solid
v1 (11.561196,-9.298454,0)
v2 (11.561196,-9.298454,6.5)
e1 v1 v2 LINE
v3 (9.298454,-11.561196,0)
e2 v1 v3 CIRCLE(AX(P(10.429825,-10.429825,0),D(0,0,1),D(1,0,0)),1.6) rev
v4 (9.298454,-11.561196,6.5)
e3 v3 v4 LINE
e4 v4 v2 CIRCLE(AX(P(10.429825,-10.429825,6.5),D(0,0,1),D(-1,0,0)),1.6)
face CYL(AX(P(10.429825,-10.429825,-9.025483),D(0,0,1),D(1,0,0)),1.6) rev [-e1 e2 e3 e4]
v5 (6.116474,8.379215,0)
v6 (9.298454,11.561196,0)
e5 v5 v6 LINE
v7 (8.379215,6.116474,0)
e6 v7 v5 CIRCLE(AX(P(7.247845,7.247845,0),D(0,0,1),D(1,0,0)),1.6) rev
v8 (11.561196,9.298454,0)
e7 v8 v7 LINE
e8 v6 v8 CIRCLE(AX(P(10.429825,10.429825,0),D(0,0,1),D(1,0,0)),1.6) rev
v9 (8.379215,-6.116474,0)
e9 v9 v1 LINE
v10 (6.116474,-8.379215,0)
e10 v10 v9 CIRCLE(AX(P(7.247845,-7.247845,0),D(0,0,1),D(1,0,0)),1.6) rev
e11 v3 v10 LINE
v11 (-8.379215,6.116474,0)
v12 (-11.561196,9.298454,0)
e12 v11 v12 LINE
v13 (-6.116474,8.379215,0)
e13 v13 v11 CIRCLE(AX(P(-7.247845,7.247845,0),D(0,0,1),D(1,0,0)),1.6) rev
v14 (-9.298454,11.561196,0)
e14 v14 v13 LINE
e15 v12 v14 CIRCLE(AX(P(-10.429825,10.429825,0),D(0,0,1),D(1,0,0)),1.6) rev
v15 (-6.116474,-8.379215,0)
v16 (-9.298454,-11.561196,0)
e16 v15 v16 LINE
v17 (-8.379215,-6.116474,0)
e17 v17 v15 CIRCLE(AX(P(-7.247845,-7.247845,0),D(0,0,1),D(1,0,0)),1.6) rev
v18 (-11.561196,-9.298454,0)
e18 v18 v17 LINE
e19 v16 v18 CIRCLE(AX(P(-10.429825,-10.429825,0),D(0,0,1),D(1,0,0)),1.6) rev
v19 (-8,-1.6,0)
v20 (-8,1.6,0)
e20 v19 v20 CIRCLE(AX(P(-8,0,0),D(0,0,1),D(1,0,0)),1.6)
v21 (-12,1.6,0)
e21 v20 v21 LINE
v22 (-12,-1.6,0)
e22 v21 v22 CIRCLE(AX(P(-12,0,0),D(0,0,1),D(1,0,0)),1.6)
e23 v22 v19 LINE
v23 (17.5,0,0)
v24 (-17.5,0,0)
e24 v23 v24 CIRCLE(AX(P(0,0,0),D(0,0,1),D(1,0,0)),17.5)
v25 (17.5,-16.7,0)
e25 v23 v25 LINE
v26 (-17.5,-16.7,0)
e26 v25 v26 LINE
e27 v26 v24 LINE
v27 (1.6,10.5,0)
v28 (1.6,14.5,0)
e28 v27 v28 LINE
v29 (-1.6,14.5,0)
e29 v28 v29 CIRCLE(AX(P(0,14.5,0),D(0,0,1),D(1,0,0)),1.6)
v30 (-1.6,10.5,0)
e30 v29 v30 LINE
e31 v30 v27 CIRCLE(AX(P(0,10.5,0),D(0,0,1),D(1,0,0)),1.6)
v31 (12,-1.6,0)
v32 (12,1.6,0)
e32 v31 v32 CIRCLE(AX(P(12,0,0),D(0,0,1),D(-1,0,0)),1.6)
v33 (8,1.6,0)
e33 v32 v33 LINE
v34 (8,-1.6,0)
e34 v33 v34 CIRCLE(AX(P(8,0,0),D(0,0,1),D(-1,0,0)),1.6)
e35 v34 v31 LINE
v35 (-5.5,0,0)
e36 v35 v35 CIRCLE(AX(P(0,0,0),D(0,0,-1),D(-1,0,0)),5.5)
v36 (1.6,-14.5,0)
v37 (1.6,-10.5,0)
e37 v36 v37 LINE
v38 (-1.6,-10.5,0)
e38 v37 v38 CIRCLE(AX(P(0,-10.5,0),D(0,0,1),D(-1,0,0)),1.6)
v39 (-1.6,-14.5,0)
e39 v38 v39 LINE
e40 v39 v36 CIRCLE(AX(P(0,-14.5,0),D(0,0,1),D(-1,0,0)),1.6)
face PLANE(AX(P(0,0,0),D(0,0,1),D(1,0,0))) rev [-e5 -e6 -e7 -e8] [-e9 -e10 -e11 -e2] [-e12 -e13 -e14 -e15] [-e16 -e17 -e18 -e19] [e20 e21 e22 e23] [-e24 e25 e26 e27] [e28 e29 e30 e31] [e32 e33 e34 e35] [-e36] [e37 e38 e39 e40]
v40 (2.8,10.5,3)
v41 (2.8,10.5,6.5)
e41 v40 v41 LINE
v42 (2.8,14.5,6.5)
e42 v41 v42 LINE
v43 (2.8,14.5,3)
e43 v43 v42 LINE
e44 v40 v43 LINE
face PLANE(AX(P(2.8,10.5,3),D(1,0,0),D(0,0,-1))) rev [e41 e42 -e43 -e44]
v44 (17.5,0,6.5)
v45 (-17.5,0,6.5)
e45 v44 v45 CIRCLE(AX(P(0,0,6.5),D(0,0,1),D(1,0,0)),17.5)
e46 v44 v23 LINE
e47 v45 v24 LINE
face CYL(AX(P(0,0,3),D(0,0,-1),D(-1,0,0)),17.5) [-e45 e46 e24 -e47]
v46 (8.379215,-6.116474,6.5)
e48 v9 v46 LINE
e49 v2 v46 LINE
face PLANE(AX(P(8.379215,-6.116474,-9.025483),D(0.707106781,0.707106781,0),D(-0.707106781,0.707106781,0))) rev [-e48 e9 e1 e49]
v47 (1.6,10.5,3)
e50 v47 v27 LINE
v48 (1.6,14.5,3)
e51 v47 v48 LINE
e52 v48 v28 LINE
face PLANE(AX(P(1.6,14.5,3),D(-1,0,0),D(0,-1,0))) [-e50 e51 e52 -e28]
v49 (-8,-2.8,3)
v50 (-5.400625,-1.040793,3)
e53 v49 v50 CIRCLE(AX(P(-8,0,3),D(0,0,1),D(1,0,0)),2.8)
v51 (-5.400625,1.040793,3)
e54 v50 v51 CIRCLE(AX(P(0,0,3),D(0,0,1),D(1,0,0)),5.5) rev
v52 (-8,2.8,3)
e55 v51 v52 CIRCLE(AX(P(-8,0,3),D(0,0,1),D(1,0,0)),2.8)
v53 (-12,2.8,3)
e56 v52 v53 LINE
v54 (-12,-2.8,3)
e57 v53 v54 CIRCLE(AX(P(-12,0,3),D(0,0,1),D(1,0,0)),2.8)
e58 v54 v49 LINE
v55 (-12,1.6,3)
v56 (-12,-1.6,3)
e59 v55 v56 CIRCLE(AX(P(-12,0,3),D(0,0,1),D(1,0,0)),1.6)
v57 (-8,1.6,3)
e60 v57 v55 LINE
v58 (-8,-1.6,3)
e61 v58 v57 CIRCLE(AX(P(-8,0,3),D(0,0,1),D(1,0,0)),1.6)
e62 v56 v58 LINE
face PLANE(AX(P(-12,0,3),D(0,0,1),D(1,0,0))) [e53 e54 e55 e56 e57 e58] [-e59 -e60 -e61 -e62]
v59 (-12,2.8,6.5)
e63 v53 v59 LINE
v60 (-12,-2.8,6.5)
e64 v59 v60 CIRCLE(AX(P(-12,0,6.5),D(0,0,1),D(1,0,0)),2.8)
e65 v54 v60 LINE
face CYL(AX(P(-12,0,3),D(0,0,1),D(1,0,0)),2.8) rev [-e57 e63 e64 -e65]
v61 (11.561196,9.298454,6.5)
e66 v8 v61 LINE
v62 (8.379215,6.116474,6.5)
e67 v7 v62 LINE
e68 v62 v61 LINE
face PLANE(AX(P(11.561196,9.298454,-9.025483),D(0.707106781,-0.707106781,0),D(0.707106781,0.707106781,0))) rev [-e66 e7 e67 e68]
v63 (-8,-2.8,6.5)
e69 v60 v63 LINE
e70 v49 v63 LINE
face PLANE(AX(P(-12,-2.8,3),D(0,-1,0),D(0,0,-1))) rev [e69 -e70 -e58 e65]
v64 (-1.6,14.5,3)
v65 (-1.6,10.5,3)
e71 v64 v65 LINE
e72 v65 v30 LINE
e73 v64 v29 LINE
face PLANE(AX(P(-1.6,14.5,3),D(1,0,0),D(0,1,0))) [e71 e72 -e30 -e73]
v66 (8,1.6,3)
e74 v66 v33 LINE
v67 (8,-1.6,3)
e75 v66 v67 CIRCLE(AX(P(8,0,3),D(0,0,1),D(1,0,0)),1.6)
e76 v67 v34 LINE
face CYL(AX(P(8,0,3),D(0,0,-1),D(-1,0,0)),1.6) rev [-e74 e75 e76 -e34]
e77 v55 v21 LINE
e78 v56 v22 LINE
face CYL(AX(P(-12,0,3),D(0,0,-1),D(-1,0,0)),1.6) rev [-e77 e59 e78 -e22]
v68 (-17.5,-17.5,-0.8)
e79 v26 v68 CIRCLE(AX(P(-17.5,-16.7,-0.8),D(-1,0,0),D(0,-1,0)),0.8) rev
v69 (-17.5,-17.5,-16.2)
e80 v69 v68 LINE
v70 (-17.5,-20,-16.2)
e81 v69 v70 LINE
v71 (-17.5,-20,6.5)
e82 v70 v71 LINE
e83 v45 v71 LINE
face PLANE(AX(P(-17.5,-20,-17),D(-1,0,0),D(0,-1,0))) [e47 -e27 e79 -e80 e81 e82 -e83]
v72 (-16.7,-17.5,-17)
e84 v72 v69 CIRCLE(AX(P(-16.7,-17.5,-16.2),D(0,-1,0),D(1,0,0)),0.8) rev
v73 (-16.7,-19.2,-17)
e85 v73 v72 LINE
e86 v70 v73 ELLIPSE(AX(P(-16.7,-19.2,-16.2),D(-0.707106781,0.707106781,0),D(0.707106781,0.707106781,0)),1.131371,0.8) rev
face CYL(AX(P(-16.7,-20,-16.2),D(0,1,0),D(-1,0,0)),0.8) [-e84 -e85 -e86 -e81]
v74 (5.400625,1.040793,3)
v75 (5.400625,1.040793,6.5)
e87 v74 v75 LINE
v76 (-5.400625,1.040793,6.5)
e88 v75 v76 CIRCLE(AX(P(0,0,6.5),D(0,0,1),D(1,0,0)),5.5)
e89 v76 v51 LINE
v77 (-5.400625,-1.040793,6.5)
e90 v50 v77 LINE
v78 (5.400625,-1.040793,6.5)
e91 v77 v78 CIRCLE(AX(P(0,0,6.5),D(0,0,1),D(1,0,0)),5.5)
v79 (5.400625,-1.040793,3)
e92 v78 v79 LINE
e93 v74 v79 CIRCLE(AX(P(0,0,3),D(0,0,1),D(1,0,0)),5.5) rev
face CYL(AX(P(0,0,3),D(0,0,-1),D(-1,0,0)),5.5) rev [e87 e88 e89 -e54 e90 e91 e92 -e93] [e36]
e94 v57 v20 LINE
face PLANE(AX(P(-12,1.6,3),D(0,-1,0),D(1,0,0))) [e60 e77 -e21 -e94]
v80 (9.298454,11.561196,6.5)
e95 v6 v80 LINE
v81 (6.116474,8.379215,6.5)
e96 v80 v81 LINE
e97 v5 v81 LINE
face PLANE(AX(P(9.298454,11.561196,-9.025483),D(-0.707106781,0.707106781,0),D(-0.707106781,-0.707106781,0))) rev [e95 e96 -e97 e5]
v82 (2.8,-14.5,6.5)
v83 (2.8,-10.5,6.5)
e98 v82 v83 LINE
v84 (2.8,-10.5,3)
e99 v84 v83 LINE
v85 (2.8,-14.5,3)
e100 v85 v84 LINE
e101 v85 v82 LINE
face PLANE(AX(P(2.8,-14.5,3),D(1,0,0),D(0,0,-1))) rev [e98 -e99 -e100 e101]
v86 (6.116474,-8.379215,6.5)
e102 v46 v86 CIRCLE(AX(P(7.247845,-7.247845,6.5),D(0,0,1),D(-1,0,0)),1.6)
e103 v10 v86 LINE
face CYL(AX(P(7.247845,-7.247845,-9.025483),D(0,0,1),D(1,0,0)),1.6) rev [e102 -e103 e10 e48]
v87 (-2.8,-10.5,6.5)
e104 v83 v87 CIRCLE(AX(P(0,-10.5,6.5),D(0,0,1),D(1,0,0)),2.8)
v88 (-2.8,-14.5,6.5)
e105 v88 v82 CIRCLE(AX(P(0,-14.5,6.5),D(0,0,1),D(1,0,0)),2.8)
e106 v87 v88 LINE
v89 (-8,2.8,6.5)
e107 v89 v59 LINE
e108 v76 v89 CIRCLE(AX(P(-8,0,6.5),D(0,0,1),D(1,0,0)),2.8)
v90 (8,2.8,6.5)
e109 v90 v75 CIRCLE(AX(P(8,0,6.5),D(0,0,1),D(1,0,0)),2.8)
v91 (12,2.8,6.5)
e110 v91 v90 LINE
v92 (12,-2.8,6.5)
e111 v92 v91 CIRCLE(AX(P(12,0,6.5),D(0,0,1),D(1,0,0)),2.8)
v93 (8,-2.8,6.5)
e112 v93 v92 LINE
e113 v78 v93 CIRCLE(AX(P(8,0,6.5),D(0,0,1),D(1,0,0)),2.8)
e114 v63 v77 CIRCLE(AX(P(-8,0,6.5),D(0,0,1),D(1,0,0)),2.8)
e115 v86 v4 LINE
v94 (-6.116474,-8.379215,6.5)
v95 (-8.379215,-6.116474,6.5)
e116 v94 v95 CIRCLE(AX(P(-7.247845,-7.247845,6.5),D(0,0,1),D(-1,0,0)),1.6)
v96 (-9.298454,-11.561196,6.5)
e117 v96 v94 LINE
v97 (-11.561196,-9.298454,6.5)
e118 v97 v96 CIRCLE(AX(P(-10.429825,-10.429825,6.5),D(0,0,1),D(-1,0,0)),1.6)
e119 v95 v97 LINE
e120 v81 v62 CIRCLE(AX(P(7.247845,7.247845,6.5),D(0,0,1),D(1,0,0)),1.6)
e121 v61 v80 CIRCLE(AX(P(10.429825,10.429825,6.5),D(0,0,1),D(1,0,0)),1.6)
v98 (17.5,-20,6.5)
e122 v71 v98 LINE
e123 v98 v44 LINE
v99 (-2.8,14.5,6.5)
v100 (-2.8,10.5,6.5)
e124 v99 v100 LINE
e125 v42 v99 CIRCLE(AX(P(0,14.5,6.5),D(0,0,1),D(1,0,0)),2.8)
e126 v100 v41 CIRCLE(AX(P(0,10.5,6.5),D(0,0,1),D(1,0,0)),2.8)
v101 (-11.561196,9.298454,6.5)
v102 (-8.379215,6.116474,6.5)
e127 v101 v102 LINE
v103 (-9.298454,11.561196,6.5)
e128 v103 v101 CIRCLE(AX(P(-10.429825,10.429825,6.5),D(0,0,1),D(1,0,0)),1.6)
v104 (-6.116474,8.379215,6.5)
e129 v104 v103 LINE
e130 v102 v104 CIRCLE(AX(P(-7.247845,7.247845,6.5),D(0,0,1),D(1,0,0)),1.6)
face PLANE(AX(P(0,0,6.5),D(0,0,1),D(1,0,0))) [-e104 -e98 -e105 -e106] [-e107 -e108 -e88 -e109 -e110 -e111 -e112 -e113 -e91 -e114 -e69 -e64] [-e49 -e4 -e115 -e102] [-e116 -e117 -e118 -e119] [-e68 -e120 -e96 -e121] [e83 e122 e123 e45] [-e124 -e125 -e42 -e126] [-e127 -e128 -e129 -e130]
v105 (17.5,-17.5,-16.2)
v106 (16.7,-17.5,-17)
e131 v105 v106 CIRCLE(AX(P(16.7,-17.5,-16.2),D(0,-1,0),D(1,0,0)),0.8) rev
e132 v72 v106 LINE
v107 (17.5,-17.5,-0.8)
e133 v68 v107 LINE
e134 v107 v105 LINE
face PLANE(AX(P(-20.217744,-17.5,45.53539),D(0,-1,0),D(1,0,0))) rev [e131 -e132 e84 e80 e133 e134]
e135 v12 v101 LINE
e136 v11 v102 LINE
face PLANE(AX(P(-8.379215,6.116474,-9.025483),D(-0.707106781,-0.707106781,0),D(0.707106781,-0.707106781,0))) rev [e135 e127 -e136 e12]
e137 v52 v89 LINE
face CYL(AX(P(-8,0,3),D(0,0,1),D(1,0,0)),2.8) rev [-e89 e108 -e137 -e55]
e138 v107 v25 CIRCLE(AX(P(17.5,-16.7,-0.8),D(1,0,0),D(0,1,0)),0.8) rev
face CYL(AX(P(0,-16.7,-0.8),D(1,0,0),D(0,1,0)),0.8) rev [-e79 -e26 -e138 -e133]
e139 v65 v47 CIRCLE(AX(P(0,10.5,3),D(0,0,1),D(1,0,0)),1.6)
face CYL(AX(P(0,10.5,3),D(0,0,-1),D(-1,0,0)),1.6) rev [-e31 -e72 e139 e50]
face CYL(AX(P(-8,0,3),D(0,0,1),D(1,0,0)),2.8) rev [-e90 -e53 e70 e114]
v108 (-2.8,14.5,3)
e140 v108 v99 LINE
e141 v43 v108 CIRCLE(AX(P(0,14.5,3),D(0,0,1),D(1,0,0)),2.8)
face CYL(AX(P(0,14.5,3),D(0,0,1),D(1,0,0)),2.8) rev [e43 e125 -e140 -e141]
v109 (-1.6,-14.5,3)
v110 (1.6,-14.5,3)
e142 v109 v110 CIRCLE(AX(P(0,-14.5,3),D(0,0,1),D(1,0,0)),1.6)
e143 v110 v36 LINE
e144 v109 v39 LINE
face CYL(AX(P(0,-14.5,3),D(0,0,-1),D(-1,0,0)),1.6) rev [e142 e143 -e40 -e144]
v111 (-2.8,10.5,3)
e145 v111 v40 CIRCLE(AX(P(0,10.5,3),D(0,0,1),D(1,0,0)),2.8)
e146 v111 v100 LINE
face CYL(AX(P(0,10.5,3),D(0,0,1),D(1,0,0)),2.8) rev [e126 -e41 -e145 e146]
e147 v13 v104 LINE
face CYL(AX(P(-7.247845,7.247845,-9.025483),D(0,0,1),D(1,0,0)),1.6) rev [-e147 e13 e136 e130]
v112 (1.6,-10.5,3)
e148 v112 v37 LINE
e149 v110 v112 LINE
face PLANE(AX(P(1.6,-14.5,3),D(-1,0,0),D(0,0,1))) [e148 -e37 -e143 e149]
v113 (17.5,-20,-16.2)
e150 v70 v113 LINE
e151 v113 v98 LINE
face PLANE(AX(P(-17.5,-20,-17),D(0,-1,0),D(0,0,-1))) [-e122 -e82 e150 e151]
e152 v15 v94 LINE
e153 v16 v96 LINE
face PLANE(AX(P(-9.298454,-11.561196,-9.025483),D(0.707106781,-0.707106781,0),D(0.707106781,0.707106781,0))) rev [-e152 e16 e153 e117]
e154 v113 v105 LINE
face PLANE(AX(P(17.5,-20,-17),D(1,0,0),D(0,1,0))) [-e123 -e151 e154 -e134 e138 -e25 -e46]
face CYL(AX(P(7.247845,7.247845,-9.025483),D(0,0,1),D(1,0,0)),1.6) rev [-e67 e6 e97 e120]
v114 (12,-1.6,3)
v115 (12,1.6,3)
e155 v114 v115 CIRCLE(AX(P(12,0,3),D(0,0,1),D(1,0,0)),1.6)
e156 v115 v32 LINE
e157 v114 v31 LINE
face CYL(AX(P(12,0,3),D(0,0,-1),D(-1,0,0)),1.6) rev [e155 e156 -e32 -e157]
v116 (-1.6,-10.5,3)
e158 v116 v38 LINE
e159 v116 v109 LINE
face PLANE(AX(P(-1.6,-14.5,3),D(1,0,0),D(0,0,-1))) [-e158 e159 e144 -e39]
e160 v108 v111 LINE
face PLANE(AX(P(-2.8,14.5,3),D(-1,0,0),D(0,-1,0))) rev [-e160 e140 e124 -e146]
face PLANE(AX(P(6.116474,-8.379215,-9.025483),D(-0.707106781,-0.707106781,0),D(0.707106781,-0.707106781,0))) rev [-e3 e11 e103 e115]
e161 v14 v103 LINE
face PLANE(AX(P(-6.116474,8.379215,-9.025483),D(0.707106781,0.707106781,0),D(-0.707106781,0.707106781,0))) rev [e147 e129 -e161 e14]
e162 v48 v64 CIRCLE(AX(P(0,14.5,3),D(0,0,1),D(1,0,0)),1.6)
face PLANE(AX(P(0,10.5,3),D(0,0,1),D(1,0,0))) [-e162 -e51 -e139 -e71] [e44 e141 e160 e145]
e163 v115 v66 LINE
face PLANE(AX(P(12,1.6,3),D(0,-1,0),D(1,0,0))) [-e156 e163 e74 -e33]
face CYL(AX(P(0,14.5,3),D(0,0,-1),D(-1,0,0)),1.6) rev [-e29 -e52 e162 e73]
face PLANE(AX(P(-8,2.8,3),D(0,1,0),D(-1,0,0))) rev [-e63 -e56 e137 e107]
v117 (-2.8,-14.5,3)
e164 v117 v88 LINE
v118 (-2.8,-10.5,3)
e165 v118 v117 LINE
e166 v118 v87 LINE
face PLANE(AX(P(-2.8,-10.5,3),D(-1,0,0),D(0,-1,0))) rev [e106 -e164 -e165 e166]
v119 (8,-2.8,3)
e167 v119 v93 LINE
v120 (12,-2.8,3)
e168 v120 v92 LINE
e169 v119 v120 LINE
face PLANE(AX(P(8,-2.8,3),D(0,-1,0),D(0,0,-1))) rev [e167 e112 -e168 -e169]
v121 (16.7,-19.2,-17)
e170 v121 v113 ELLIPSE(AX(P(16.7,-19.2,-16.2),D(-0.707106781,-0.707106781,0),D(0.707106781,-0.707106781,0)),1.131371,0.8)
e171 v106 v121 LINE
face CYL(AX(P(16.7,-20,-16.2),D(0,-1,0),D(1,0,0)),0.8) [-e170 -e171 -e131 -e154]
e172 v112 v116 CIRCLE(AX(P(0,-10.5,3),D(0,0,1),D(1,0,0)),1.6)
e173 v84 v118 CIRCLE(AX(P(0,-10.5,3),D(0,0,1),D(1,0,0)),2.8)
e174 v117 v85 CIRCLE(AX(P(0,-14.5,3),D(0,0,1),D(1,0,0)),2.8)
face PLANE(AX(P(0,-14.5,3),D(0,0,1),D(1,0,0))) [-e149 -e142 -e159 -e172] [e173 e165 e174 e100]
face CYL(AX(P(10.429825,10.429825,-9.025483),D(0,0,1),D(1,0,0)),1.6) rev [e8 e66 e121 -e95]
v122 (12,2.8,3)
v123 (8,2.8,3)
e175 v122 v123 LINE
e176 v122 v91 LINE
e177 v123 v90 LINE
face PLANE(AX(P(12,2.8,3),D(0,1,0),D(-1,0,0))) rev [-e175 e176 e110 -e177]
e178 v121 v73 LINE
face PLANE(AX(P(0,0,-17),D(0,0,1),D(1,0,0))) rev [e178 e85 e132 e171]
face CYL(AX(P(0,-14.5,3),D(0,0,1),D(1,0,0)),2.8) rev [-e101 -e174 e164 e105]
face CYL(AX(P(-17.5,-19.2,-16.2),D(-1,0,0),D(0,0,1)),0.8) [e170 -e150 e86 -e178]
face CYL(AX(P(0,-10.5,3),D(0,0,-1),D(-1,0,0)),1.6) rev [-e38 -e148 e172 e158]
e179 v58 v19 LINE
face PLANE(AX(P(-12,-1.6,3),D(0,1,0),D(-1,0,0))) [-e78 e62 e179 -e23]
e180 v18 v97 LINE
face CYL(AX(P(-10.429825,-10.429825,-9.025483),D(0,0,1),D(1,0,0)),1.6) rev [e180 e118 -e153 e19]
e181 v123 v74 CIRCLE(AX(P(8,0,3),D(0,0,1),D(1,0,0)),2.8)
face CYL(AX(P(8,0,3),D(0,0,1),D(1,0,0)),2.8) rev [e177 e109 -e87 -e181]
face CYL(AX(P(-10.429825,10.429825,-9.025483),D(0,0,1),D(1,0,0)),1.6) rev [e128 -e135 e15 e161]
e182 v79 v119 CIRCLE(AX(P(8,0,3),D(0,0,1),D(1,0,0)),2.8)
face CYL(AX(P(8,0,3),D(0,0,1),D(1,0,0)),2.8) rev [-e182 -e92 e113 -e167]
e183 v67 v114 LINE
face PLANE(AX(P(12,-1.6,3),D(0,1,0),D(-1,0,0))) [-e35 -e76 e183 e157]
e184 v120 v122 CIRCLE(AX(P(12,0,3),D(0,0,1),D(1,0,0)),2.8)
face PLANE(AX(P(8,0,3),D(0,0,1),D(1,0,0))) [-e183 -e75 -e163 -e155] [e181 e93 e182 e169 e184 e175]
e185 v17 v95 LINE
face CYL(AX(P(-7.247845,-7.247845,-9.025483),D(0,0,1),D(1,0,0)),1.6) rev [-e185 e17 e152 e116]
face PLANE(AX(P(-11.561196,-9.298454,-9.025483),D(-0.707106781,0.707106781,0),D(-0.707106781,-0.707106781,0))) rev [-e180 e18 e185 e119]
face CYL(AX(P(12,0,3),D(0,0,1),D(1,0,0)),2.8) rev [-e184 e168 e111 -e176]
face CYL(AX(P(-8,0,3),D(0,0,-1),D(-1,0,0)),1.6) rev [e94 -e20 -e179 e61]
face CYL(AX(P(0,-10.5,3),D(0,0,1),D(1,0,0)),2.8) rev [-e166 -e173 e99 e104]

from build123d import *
from build123d.topology import SkipClean

# Parameters (mm, degrees)
SKETCH_1_R          = 17.5
EXTRUDE_1_DEPTH     = 3
EXTRUDE_START       = -20
EXTRUDE_2_DEPTH     = 20
SKETCH_3_W          = 42.038336367
SKETCH_3_H          = 17.5
CUT_EXTRUDE_2_DEPTH = 17
FILLET_1_R          = 0.8
SKETCH_4_R          = 5.5
CUT_EXTRUDE_3_DEPTH = 32.547583109
SKETCH_5_R          = 5.5
EXTRUDE_3_DEPTH     = 3.5
CUT_EXTRUDE_START   = -3.5
CUT_EXTRUDE_5_DEPTH = 3.5
CUT_EXTRUDE_6_DEPTH = 6.5


with BuildPart() as part:
    # 草图1 → 凸台-拉伸1 (new body)
    with BuildSketch(Plane.XY):
        Circle(SKETCH_1_R)
        with BuildLine():
            Line((1.6, 14.5), (1.6, 10.5))
            ThreePointArc((1.6, 10.5), (0, 8.9), (-1.6, 10.5))
            Line((-1.6, 10.5), (-1.6, 14.5))
            ThreePointArc((-1.6, 14.5), (0, 16.1), (1.6, 14.5))
        make_face(mode=Mode.SUBTRACT)
        with BuildLine():
            Line((1.6, -14.5), (1.6, -10.5))
            ThreePointArc((1.6, -10.5), (0, -8.9), (-1.6, -10.5))
            Line((-1.6, -10.5), (-1.6, -14.5))
            ThreePointArc((-1.6, -14.5), (0, -16.1), (1.6, -14.5))
        make_face(mode=Mode.SUBTRACT)
        with BuildLine():
            Line((-12, 1.6), (-8, 1.6))
            ThreePointArc((-8, 1.6), (-6.4, 0), (-8, -1.6))
            Line((-8, -1.6), (-12, -1.6))
            ThreePointArc((-12, -1.6), (-13.6, 0), (-12, 1.6))
        make_face(mode=Mode.SUBTRACT)
        with BuildLine():
            Line((12, 1.6), (8, 1.6))
            ThreePointArc((8, 1.6), (6.4, 0), (8, -1.6))
            Line((8, -1.6), (12, -1.6))
            ThreePointArc((12, -1.6), (13.6, 0), (12, 1.6))
        make_face(mode=Mode.SUBTRACT)
    extrude(amount=EXTRUDE_1_DEPTH)

    # 草图2 → 凸台-拉伸2 (add)
    with BuildSketch(Plane.XY.offset(3).offset(EXTRUDE_START)):
        with BuildLine():
            Line((-17.5, -20), (17.5, -20))
            Line((17.5, -20), (17.5, 0))
            ThreePointArc((17.5, 0), (0, -17.5), (-17.5, 0))
            Line((-17.5, 0), (-17.5, -20))
        make_face()
    extrude(amount=EXTRUDE_2_DEPTH)

    # 草图3 → 切除-拉伸2 (cut)
    with BuildSketch(Plane(origin=(0, 0, -17), x_dir=(-1, 0, 0), z_dir=(0, 0, -1))):
        with Locations((-0.801424091, -8.75)):
            Rectangle(SKETCH_3_W, SKETCH_3_H)
    extrude(amount=-CUT_EXTRUDE_2_DEPTH, mode=Mode.SUBTRACT)

    # 圆角1
    fillet_1_edges = [part.edges().sort_by_distance(p)[0] for p in [
        (17.5, -18.75, -17),
        (0, -20, -17),
        (-17.5, -18.75, -17),
        (0, -17.5, 0),
    ]]
    fillet(fillet_1_edges, radius=FILLET_1_R)

    # 草图4 → 切除-拉伸3 (cut, through all)
    with BuildSketch(Plane(origin=(0, 0, 0), x_dir=(-1, 0, 0), z_dir=(0, 0, -1))):
        Circle(SKETCH_4_R)
    extrude(amount=-CUT_EXTRUDE_3_DEPTH, mode=Mode.SUBTRACT)

    # 草图5 → 凸台-拉伸3 (add)
    with SkipClean():  # the faces are left unmerged after this step: merging them gives an invalid solid
        with BuildSketch(Plane.XY.offset(3)):
            with BuildLine():
                Line((-17.5, 0), (-17.5, -20))
                Line((-17.5, -20), (17.5, -20))
                Line((17.5, -20), (17.5, 0))
                ThreePointArc((17.5, 0), (0, 17.5), (-17.5, 0))
            make_face()
            with Locations(Location((0, 0, 0), (0, 0, 180))):
                Circle(SKETCH_5_R, mode=Mode.SUBTRACT)
            with BuildLine():
                Line((1.6, -14.5), (1.6, -10.5))
                ThreePointArc((1.6, -10.5), (0, -8.9), (-1.6, -10.5))
                Line((-1.6, -10.5), (-1.6, -14.5))
                ThreePointArc((-1.6, -14.5), (0, -16.1), (1.6, -14.5))
            make_face(mode=Mode.SUBTRACT)
            with BuildLine():
                Line((-8, 1.6), (-12, 1.6))
                ThreePointArc((-12, 1.6), (-13.6, 0), (-12, -1.6))
                Line((-12, -1.6), (-8, -1.6))
                ThreePointArc((-8, -1.6), (-6.4, 0), (-8, 1.6))
            make_face(mode=Mode.SUBTRACT)
            with BuildLine():
                Line((8, -1.6), (12, -1.6))
                ThreePointArc((12, -1.6), (13.6, 0), (12, 1.6))
                Line((12, 1.6), (8, 1.6))
                ThreePointArc((8, 1.6), (6.4, 0), (8, -1.6))
            make_face(mode=Mode.SUBTRACT)
            with BuildLine():
                Line((1.6, 10.5), (1.6, 14.5))
                ThreePointArc((1.6, 14.5), (0, 16.1), (-1.6, 14.5))
                Line((-1.6, 14.5), (-1.6, 10.5))
                ThreePointArc((-1.6, 10.5), (0, 8.9), (1.6, 10.5))
            make_face(mode=Mode.SUBTRACT)
        extrude(amount=EXTRUDE_3_DEPTH)
    add(part.part.scale(1), mode=Mode.REPLACE)  # the faces are merged on a copy

    # 草图7 → 切除-拉伸5 (cut)
    # profile 1 of 4: a face of its own
    with BuildSketch(Plane.XY.offset(6.5).offset(CUT_EXTRUDE_START)):
        with BuildLine():
            Line((2.8, -14.5), (2.8, -10.5))
            ThreePointArc((2.8, -10.5), (0, -7.7), (-2.8, -10.5))
            Line((-2.8, -10.5), (-2.8, -14.5))
            ThreePointArc((-2.8, -14.5), (0, -17.3), (2.8, -14.5))
        make_face()
        with BuildLine():
            Line((1.6, -14.5), (1.6, -10.5))
            ThreePointArc((1.6, -10.5), (0, -8.9), (-1.6, -10.5))
            Line((-1.6, -10.5), (-1.6, -14.5))
            ThreePointArc((-1.6, -14.5), (0, -16.1), (1.6, -14.5))
        make_face(mode=Mode.SUBTRACT)
    # profile 2 of 4: a face of its own
    with BuildSketch(Plane.XY.offset(6.5).offset(CUT_EXTRUDE_START)):
        with BuildLine():
            Line((8, -2.8), (12, -2.8))
            ThreePointArc((12, -2.8), (14.8, 0), (12, 2.8))
            Line((12, 2.8), (8, 2.8))
            ThreePointArc((8, 2.8), (5.2, 0), (8, -2.8))
        make_face()
        with BuildLine():
            Line((8, -1.6), (12, -1.6))
            ThreePointArc((12, -1.6), (13.6, 0), (12, 1.6))
            Line((12, 1.6), (8, 1.6))
            ThreePointArc((8, 1.6), (6.4, 0), (8, -1.6))
        make_face(mode=Mode.SUBTRACT)
    # profile 3 of 4: a face of its own
    with BuildSketch(Plane.XY.offset(6.5).offset(CUT_EXTRUDE_START)):
        with BuildLine():
            Line((-12, -2.8), (-8, -2.8))
            ThreePointArc((-8, -2.8), (-5.2, 0), (-8, 2.8))
            Line((-8, 2.8), (-12, 2.8))
            ThreePointArc((-12, 2.8), (-14.8, 0), (-12, -2.8))
        make_face()
        with BuildLine():
            Line((-12, -1.6), (-8, -1.6))
            ThreePointArc((-8, -1.6), (-6.4, 0), (-8, 1.6))
            Line((-8, 1.6), (-12, 1.6))
            ThreePointArc((-12, 1.6), (-13.6, 0), (-12, -1.6))
        make_face(mode=Mode.SUBTRACT)
    # profile 4 of 4: a face of its own
    with BuildSketch(Plane.XY.offset(6.5).offset(CUT_EXTRUDE_START)):
        with BuildLine():
            Line((2.8, 10.5), (2.8, 14.5))
            ThreePointArc((2.8, 14.5), (0, 17.3), (-2.8, 14.5))
            Line((-2.8, 14.5), (-2.8, 10.5))
            ThreePointArc((-2.8, 10.5), (0, 7.7), (2.8, 10.5))
        make_face()
        with BuildLine():
            Line((1.6, 10.5), (1.6, 14.5))
            ThreePointArc((1.6, 14.5), (0, 16.1), (-1.6, 14.5))
            Line((-1.6, 14.5), (-1.6, 10.5))
            ThreePointArc((-1.6, 10.5), (0, 8.9), (1.6, 10.5))
        make_face(mode=Mode.SUBTRACT)
    extrude(amount=CUT_EXTRUDE_5_DEPTH, mode=Mode.SUBTRACT)

    # 草图8 → 切除-拉伸6 (cut)
    with BuildSketch(Plane.XY.offset(6.5)):
        with BuildLine():
            Line((11.561195872, 9.298454173), (8.379215357, 6.116473657))
            ThreePointArc((8.379215357, 6.116473657), (6.116473657, 6.116473657), (6.116473657, 8.379215357))
            Line((6.116473657, 8.379215357), (9.298454173, 11.561195872))
            ThreePointArc((9.298454173, 11.561195872), (11.561195872, 11.561195872), (11.561195872, 9.298454173))
        make_face()
        with BuildLine():
            Line((-8.379215357, 6.116473657), (-11.561195872, 9.298454173))
            ThreePointArc((-11.561195872, 9.298454173), (-11.561195872, 11.561195872), (-9.298454173, 11.561195872))
            Line((-9.298454173, 11.561195872), (-6.116473657, 8.379215357))
            ThreePointArc((-6.116473657, 8.379215357), (-6.116473657, 6.116473657), (-8.379215357, 6.116473657))
        make_face()
        with BuildLine():
            Line((6.116473657, -8.379215357), (9.298454173, -11.561195872))
            ThreePointArc((9.298454173, -11.561195872), (11.561195872, -11.561195872), (11.561195872, -9.298454173))
            Line((11.561195872, -9.298454173), (8.379215357, -6.116473657))
            ThreePointArc((8.379215357, -6.116473657), (6.116473657, -6.116473657), (6.116473657, -8.379215357))
        make_face()
        with BuildLine():
            Line((-9.298454173, -11.561195872), (-6.116473657, -8.379215357))
            ThreePointArc((-6.116473657, -8.379215357), (-6.116473657, -6.116473657), (-8.379215357, -6.116473657))
            Line((-8.379215357, -6.116473657), (-11.561195872, -9.298454173))
            ThreePointArc((-11.561195872, -9.298454173), (-11.561195872, -11.561195872), (-9.298454173, -11.561195872))
        make_face()
    extrude(amount=-CUT_EXTRUDE_6_DEPTH, mode=Mode.SUBTRACT)


solid = part.part
